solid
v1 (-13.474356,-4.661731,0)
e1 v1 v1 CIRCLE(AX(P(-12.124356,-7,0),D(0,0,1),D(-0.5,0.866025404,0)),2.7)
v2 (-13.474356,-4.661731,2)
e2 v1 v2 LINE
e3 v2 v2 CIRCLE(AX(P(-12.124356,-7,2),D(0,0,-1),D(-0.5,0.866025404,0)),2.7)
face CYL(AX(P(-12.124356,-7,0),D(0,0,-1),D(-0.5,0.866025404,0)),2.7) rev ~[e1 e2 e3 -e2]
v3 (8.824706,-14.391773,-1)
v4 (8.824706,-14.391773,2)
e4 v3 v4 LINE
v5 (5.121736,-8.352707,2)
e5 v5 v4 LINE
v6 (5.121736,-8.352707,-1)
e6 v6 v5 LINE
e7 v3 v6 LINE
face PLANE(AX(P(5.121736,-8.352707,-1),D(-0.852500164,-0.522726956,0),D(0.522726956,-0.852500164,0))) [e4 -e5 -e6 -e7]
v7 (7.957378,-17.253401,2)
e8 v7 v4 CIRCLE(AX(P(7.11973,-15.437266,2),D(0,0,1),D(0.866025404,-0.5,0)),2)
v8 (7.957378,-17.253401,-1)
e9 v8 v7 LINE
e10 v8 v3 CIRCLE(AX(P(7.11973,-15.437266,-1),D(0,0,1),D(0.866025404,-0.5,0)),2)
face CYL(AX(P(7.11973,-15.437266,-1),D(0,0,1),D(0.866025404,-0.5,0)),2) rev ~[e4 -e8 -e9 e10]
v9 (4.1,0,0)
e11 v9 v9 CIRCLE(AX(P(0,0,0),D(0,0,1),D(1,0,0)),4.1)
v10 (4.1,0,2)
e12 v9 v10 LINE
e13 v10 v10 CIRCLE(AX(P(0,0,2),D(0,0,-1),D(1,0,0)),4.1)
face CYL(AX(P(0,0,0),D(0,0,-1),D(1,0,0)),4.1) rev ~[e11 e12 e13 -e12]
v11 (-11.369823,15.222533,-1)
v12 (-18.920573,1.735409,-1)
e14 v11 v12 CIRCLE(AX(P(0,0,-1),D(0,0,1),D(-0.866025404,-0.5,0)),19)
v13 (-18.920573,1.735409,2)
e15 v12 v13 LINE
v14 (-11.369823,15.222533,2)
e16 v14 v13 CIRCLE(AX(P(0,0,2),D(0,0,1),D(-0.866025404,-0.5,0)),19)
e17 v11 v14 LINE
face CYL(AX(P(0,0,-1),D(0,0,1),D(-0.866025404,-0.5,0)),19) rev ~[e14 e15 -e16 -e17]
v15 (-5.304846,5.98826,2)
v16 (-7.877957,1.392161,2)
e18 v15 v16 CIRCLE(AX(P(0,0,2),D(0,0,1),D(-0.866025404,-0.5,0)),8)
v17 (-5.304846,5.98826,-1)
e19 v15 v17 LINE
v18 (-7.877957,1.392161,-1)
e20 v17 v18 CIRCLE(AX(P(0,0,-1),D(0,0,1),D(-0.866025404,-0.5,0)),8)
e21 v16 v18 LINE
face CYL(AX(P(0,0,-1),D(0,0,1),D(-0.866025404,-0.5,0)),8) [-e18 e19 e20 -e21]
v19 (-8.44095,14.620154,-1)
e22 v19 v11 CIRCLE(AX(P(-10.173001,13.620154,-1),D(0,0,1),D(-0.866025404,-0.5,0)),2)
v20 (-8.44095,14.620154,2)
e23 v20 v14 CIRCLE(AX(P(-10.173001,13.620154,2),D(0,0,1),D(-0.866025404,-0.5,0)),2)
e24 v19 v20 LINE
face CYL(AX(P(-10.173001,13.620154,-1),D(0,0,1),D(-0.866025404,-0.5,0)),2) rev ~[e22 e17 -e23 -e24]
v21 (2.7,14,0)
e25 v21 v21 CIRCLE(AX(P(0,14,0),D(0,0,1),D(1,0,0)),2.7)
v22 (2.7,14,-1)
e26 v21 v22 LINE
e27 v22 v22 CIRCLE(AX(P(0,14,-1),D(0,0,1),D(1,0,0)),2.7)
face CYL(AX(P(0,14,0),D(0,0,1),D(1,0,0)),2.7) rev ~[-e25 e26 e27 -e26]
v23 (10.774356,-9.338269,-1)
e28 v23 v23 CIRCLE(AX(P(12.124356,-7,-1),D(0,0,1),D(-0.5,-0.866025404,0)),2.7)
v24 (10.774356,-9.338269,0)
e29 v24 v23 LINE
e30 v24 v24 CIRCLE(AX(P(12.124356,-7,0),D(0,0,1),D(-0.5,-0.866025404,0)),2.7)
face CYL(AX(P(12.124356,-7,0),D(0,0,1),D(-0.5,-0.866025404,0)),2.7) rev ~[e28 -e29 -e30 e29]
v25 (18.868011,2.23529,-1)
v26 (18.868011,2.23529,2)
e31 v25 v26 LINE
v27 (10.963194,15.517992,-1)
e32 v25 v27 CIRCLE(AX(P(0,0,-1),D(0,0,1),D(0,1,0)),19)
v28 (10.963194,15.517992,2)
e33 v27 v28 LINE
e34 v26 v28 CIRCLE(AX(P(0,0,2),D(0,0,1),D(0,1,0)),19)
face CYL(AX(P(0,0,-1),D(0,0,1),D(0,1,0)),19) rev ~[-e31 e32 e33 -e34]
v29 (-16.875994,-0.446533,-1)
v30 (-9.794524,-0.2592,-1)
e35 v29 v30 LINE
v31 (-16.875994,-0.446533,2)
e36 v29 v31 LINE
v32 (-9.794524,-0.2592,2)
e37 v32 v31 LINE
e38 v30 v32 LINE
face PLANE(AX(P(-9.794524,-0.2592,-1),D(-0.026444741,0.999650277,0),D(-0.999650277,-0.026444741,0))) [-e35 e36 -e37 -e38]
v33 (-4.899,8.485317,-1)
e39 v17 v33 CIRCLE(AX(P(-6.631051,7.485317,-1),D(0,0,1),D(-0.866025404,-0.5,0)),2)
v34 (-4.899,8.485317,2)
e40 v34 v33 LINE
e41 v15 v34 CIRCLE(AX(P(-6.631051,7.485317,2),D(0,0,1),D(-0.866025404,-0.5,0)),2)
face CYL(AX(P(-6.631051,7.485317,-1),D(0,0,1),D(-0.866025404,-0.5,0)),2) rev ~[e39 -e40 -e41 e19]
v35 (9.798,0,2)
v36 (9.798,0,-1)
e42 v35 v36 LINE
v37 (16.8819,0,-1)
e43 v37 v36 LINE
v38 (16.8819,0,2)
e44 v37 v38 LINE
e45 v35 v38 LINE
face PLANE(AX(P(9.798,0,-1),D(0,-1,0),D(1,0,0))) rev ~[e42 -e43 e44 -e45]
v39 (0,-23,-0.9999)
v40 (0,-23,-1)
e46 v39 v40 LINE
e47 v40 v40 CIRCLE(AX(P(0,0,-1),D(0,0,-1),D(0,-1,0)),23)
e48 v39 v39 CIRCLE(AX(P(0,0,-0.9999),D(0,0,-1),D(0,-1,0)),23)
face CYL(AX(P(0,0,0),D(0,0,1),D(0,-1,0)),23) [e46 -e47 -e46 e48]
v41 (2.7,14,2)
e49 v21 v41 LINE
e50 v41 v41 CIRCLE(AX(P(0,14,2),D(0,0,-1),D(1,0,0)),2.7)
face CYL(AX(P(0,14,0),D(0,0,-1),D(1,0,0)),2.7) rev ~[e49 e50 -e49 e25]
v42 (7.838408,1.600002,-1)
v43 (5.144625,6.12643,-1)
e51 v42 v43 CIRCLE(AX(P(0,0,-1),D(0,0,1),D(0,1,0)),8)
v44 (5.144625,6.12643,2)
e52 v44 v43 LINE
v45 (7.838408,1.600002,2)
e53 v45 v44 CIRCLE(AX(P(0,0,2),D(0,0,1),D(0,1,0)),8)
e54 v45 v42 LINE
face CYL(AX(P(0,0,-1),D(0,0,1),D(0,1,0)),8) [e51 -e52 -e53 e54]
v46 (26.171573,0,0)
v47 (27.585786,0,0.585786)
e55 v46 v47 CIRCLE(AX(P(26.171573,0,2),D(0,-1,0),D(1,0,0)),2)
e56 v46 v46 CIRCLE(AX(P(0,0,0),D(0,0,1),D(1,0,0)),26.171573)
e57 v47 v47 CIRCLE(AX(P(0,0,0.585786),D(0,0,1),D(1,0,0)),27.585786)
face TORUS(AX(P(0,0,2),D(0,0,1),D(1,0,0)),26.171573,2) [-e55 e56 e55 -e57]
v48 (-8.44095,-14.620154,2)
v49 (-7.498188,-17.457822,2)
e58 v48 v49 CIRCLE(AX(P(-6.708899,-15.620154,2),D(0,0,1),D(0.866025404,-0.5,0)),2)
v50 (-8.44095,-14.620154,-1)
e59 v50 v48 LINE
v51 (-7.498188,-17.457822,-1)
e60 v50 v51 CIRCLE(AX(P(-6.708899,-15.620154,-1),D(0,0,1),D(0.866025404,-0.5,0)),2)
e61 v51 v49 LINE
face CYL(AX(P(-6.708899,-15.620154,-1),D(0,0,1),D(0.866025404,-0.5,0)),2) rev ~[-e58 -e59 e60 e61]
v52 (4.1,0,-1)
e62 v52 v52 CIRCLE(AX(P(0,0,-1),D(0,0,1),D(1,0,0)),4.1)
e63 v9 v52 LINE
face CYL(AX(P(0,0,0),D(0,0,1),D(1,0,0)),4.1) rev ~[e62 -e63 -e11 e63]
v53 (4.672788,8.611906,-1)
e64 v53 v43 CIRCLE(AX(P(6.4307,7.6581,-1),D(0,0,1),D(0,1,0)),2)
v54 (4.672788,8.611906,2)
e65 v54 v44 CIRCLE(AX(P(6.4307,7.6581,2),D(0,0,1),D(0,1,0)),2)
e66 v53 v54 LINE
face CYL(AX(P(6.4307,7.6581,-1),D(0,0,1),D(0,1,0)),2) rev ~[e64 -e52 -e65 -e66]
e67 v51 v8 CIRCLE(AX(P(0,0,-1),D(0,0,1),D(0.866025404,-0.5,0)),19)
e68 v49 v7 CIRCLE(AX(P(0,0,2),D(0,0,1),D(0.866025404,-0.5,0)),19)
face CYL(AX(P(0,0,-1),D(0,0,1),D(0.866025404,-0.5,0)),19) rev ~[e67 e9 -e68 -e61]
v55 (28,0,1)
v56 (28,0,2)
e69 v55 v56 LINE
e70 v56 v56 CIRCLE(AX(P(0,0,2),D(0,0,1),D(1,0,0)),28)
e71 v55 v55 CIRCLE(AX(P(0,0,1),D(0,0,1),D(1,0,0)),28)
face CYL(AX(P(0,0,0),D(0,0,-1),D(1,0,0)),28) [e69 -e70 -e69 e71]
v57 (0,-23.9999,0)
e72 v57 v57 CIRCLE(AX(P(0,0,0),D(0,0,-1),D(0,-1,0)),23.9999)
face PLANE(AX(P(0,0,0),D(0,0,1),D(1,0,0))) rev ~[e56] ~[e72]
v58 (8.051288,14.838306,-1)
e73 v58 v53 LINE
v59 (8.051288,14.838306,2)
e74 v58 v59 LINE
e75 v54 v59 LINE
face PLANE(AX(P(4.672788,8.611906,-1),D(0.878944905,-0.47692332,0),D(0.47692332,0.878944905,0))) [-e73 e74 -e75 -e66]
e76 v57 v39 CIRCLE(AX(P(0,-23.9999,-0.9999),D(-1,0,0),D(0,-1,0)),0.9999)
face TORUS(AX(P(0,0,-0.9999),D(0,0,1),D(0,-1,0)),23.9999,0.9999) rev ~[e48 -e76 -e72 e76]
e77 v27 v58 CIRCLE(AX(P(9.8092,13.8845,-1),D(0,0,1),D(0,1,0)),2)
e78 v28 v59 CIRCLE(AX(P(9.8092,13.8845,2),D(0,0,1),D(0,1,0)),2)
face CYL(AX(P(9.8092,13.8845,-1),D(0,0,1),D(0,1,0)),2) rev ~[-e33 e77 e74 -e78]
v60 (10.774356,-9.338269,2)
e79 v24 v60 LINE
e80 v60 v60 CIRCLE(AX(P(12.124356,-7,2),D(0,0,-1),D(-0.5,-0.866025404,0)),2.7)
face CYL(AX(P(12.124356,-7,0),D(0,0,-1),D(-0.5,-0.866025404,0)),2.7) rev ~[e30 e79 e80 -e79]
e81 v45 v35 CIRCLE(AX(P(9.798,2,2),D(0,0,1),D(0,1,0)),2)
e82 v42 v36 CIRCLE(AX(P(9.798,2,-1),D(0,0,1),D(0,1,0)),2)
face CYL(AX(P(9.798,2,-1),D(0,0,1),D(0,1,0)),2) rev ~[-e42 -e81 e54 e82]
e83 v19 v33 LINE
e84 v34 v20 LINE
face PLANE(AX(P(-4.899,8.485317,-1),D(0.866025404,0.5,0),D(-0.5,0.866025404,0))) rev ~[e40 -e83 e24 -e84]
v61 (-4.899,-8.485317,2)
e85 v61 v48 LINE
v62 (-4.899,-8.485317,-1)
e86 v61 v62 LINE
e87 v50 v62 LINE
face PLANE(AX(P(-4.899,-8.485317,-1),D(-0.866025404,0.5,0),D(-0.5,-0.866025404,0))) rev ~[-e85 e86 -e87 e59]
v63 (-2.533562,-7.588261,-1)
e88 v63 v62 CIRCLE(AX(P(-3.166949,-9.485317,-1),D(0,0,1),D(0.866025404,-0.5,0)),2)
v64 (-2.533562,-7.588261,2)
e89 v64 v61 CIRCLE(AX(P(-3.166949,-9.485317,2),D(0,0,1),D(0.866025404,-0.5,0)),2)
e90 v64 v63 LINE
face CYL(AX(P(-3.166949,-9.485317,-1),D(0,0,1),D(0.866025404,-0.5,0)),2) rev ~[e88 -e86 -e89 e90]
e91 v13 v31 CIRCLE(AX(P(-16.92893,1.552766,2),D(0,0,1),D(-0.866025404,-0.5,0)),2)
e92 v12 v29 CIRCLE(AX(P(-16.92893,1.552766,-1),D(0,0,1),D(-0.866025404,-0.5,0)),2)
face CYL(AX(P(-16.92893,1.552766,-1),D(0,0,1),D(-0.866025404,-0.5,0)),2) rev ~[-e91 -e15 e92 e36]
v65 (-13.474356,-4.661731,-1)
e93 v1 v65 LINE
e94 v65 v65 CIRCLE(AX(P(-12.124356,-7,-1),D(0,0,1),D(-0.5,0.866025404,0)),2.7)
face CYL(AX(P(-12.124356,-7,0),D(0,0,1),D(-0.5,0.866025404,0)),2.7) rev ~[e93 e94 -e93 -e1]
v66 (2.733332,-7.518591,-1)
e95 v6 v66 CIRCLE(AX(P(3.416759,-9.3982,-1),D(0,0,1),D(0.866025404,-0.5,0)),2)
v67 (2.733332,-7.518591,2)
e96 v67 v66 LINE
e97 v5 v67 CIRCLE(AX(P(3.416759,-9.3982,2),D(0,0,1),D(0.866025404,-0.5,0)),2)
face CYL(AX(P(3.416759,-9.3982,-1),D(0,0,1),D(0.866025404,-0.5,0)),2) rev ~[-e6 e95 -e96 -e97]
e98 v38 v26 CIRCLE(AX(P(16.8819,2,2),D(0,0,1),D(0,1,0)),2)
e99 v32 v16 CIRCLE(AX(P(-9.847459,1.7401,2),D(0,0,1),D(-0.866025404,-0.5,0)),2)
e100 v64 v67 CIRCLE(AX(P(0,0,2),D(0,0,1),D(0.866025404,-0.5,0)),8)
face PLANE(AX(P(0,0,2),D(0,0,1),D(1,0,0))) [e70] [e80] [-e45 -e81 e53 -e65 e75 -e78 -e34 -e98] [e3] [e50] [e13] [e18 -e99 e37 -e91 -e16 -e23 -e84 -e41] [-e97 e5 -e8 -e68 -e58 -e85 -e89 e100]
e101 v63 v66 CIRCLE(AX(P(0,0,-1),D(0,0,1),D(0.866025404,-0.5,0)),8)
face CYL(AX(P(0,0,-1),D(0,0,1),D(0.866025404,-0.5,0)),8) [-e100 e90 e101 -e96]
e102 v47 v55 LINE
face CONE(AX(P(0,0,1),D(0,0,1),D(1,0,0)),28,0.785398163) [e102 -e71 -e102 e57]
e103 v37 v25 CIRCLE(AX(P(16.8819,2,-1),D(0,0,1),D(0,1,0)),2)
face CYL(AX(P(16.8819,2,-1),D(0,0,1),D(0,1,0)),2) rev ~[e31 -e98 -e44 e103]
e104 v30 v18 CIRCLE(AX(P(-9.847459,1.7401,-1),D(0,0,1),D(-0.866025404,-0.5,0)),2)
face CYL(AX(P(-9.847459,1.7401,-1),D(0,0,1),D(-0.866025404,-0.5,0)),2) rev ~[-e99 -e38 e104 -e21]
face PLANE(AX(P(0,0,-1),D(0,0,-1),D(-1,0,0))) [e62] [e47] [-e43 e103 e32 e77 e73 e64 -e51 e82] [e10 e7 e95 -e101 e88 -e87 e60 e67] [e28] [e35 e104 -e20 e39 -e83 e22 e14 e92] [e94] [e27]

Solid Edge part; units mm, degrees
sketch "Sketch1" plane through (0, 0, 0) normal (0, 0, 1) x (1, 0, 0)
  circle A0 centre (0, 0) radius 28
extrude "Protrusion1" add sketch "Sketch1" along normal blind 2
sketch "Sketch2" plane through (0, 0, 0) normal (0, 0, -1) x (0, -1, 0)
  circle A0 centre (0, 0) radius 23
extrude "ExtrudedProtrusion_2" add sketch "Sketch2" along normal blind 1
sketch "Sketch3" plane through (0, 0, 0) normal (0, 0, 1) x (1, 0, 0)
  circle A0 centre (0, 14) radius 2.7
  dimension "D1" = 14
  dimension "D2" = 5.4
extrude "Cutout1" cut sketch "Sketch3" along normal through all and the other way through all
pattern_circular "Pattern1" count 3 over 360 about axis through (0, 0, 2) along (0, 0, -1) of "Cutout1"
sketch "Sketch4" plane through (0, 0, 0) normal (0, 0, 1) x (1, 0, 0)
  circle A0 centre (0, 0) radius 4.1
  dimension "D1" = 8.2
extrude "Cutout4" cut sketch "Sketch4" along normal through all and the other way through all
sketch "Sketch5" plane through (0, 0, -1) normal (0, 0, -1) x (0, 1, 0)
  line L0 (0, 9.798) -> (0, 16.8819)
  arc A0 (2.2353, 18.8681) -> (0, 16.8819) centre (2, 16.8819) ccw
  arc A1 (14.8383, 8.0513) -> (15.518, 10.9632) centre (13.8845, 9.8092) ccw
  line L1 (8.6119, 4.6728) -> (14.8383, 8.0513)
  arc A2 (6.1264, 5.1446) -> (8.6119, 4.6728) centre (7.6581, 6.4307) ccw
  arc A3 (0, 9.798) -> (1.6, 7.8384) centre (2, 9.798) ccw
  arc A4 (6.1264, 5.1446) -> (1.6, 7.8384) centre (0, 0) ccw
  arc A5 (2.2353, 18.8681) -> (15.518, 10.9632) centre (0, 0) cw
extrude "Cutout5" cut sketch "Sketch5" along normal through all and the other way through all
pattern_circular "Pattern2" count 3 over 360 about axis through (0, 0, -1) along (0, 0, 1) of "Cutout5"
fillet "Round_1" radius 1 1 edges at (23, 0, 0)
chamfer "Chamfer_1" distance 1 angle 45 1 edges at (-28, 0, 0)
fillet "Round_2" radius 2 1 edges at (27, 0, 0)
properties material "ABS Plastic, medium impact"
